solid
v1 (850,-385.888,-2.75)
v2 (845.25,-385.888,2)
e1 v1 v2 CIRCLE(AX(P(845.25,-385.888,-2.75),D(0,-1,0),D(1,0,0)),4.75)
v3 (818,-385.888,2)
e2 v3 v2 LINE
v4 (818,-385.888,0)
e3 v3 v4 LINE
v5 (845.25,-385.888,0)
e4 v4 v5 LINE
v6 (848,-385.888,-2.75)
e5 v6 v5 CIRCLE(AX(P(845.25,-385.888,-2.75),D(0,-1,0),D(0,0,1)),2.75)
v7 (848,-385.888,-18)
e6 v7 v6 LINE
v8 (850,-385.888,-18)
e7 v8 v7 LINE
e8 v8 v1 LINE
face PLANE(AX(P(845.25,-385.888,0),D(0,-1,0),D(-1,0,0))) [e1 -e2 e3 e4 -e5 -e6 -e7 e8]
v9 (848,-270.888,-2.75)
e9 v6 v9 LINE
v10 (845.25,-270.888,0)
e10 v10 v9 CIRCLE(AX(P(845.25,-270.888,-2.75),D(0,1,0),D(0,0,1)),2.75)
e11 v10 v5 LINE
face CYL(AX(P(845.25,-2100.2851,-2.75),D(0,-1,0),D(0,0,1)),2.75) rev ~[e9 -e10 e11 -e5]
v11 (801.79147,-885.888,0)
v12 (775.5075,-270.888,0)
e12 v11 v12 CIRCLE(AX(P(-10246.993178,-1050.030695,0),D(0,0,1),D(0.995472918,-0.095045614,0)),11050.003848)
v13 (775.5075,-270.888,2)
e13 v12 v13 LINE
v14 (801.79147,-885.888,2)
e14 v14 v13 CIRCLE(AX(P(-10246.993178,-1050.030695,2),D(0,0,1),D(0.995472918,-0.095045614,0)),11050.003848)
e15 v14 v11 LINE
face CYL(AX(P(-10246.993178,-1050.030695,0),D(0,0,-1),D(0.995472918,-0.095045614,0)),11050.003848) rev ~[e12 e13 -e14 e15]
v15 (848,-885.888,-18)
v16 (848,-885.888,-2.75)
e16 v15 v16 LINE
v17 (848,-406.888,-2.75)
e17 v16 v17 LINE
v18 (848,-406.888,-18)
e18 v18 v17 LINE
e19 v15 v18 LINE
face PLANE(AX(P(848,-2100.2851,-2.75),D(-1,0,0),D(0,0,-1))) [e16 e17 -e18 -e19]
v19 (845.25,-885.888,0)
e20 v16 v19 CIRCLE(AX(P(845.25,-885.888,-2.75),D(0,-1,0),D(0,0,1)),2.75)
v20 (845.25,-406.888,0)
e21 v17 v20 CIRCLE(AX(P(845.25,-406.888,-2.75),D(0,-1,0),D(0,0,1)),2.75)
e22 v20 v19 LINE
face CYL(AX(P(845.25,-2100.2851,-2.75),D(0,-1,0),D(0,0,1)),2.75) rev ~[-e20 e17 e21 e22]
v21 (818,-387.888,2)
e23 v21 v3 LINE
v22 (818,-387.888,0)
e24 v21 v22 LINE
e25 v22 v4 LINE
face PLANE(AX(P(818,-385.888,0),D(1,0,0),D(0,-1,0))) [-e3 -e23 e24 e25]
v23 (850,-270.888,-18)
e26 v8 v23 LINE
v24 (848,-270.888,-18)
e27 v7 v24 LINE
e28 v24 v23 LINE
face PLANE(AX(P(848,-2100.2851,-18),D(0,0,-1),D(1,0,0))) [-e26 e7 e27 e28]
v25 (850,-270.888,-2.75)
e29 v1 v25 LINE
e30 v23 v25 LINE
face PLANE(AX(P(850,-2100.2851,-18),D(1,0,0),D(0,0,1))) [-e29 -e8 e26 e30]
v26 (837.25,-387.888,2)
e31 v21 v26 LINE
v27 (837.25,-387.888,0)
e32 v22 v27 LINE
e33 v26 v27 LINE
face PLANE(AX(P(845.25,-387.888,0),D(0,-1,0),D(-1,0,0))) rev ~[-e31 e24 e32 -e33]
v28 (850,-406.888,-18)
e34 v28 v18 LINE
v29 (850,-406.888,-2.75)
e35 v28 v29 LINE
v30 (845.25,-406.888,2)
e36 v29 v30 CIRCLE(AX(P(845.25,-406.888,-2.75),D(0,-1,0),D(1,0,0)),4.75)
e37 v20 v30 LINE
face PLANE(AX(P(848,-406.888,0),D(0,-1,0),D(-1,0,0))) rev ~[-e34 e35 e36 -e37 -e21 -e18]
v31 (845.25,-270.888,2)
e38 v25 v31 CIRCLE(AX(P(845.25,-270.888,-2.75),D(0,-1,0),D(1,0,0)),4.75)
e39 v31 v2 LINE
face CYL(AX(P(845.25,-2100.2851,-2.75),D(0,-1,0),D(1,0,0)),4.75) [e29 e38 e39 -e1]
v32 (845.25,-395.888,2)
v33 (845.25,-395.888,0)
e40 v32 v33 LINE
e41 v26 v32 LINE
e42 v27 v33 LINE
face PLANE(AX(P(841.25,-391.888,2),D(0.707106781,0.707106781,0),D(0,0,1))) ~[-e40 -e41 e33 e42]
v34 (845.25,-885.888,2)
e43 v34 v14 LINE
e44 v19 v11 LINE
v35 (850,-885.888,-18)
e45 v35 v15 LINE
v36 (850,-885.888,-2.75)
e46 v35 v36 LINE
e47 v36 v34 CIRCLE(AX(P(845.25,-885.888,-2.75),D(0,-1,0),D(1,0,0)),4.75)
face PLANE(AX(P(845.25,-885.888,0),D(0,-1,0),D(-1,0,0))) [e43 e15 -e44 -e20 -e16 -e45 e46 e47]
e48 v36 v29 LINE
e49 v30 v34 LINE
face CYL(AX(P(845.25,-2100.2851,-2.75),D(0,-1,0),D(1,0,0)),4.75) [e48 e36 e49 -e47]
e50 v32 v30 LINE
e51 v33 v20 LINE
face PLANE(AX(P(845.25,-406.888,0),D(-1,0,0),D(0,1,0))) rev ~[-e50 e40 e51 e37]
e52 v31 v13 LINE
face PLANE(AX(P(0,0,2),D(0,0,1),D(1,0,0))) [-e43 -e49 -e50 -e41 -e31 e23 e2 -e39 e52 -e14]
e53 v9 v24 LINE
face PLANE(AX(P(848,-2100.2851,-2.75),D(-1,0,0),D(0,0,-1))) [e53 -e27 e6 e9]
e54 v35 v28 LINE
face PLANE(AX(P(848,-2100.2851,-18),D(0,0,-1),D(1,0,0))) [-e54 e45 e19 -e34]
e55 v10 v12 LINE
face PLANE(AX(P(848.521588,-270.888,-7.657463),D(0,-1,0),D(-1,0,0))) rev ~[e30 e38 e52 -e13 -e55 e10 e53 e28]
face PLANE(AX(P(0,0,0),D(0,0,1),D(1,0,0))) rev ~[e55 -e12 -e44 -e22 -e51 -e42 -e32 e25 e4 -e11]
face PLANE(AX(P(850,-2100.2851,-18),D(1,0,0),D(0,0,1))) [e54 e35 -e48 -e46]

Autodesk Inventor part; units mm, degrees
ref_plane "YZ Plane" through (0, 0, 0) normal (1, 0, 0) x (0, 1, 0)
ref_plane "XZ Plane" through (0, 0, 0) normal (0, 1, 0) x (-1, 0, 0)
ref_plane "XY Plane" through (0, 0, 0) normal (0, 0, 1) x (1, 0, 0)
sketch "Sketch1" plane through (0, 0, 0) normal (0, 0, 1) x (1, 0, 0)
  arc A0 (750, -2100) -> (771.0671, -250.888) centre (-10250, -1050) ccw construction
  arc A1 (752.9864, -2100.2851) -> (772.2226, -225.7318) centre (-10246.9893, -1050.0309) ccw
  line L0 (-750, -2700) -> (-750, 0) construction
  line L1 (-800, 50) -> (-800, -2750) construction
  line L2 (-850, -2800) -> (-850, 100) construction
  line L3 (850, 100) -> (850, -2800)
  line L4 (800, -2750) -> (800, 50) construction
  line L5 (750, 0) -> (750, -2700) construction
  line L6 (771.0671, -250.888) -> (768.075, -251.105) construction
  line L7 (769.231, -225.9556) -> (772.2226, -225.7318) construction
  arc A2 (747.4657, -5.0326) -> (744.8748, -2.3426) centre (744.4792, -5.3164) ccw construction
  arc A3 (747.4657, -5.0326) -> (747.0136, -0.2851) centre (-10252.9897, -1050.251) ccw construction
  arc A4 (768.075, -251.105) -> (747.4657, -5.0326) centre (-10252.9897, -1050.251) ccw construction
  line L8 (750, 0) -> (747.0136, -0.2851) construction
  arc A5 (750.4522, -4.7486) -> (750, 0) centre (-10250, -1050) ccw construction
  arc A6 (750.4522, -4.7486) -> (745.2706, 0.6314) centre (744.4791, -5.3162) ccw
  line L9 (-750, 0) -> (750, 0) construction
  line L10 (-850, 100) -> (850, 100) construction
  line L11 (800, 50) -> (-800, 50) construction
  arc A7 (771.0671, -250.888) -> (750.4522, -4.7486) centre (-10250, -1050) ccw
  line L12 (750, -2700) -> (-750, -2700) construction
  line L13 (750, -2100) -> (752.9864, -2100.2851) construction
  line L14 (-800, -2750) -> (800, -2750)
  line L15 (850, -2800) -> (-850, -2800) construction
  arc A8 (110, -2700) -> (114.1118, -2698.3696) centre (110, -2694) ccw construction
  line L16 (0, -2697) -> (110, -2697) construction
  line L17 (0, -2700) -> (0, -2697) construction
  arc A9 (750, 0) -> (745.2706, 0.6314) centre (0, -5600) ccw construction
  line L18 (750, 0) -> (749.6018, -2.9735) construction
  arc A10 (750, -3.0268) -> (0, 47) centre (-0.2, -5603) ccw construction
  line L19 (0, 47) -> (0, 0) construction
  line L20 (0, 50) -> (0, 47) construction
  line L21 (0, 100) -> (0, 50)
  arc A11 (745.2706, 0.6314) -> (0, 50) centre (0, -5600) ccw construction
  line L22 (-750, -2100) -> (750, -2100) construction
  arc A12 (110, -2697) -> (112.0559, -2696.1848) centre (110, -2694) ccw construction
  line L23 (676.3163, -2173.4556) -> (674.2605, -2171.2708) construction
  line L24 (690.4112, -2151.9536) -> (692.4671, -2154.1384) construction
  line L25 (752.0559, -2102.1848) -> (676.3163, -2173.4556) construction
  line L26 (114.1118, -2698.3696) -> (750, -2100) construction
  arc A13 (752.0559, -2102.1848) -> (752.9864, -2100.2851) centre (749.9998, -2099.9999) ccw construction
  line L27 (750, -2100) -> (752.0559, -2102.1848) construction
  arc A14 (749.1768, -2100.7746) -> (750.1074, -2098.8746) centre (747.1209, -2098.5898) ccw construction
  line L28 (112.0559, -2696.1848) -> (690.4112, -2151.9536) construction
  line L29 (850, -270.888) -> (775.5075, -270.888)
  arc A15 (800, 50) -> (0, 100) centre (0, -6325) ccw construction
  arc A16 (825.5075, -270.888) -> (800, 50) centre (-10637.5382, -1020.6324) ccw construction
  line L30 (825.5075, -270.888) -> (825.5075, 100) construction
  arc A17 (790.2374, -2130.793) -> (825.5075, -270.888) centre (-10200.9329, -992.0761) ccw construction
  line L31 (0, -2700) -> (0, -2750) construction
  line L32 (112.3791, -2700) -> (132.2053, -2750) construction
  line L33 (132.2053, -2750) -> (850, -2074.5565)
  arc A18 (771.0107, -250.8921) -> (767.3384, -201.0273) centre (769.231, -225.9556) ccw construction
  line L34 (850, -400) -> (783.8747, -400) construction
  line L35 (850, -900) -> (801.9921, -900) construction
  line L36 (850, -1400) -> (797.4673, -1400) construction
  line L37 (850, -1900) -> (770.2723, -1900) construction
  line L38 (350, 100) -> (350, 39.1489)
  line L39 (-1472.612, -150) -> (-973.4947, -150)
  line L40 (-1472.612, -700) -> (-973.4947, -700)
  line L41 (-1472.612, -1250) -> (-973.4947, -1250)
  line L42 (-1472.612, -1800) -> (-973.4947, -1800)
  line L43 (800, -2750) -> (850, -2750) construction
  line L44 (752.9864, -2100.2851) -> (850, -2100.2851)
  point P0 (822.6583, -2100.2851)
  dimension "d16" = 1500
  dimension "d17" = 2700
  dimension "d18" = 2100
  dimension "d19" = 6
  dimension "d20" = 3
  dimension "d21" = 3
  dimension "d22" = 6
  dimension "d23" = 3
  dimension "d24" = 251.771
  dimension "d25" = 50
  dimension "d26" = 50
  dimension "d27" = 3
  dimension "d28" = 110
  dimension "d29" = 25
  dimension "d30" = 104
  dimension "d31" = 25
  dimension "d32" = 20
  dimension "d33" = 50
  dimension "d57" = 500
  dimension "d58" = 500
  dimension "d59" = 500
  dimension "d60" = 500
  dimension "d61" = 500
  dimension "d83" = 250
  dimension "d86" = 550
  dimension "d91" = 274.5565
extrude "Plate3" add sketch "Sketch1" along normal blind 2
sketch "Sketch3" plane through (848, -270.888, 2) normal (1, 0, 0) x (0, 1, 0)
  line L0 (-1829.397, 0) -> (0, 0)
  line L1 (0, 0) -> (0, 20)
  line L2 (0, 20) -> (-1829.397, 20)
  line L3 (-1829.397, 20) -> (-1829.397, 0)
edge flange "Flange2" height 20 angle 90 thickness 2 bend radius 2.75 thickness toward (1, 0, 0) relief round relief width 2 relief depth 1 edges at (850, -1172.7223, 2) wall of the first edge with corners at (848, -2100.2851, 2) (848, -270.888, 2) (848, -270.888, -18) (848, -2100.2851, -18)
bend "Bend2"
corner "Corner2"
sketch "Sketch5" plane through (0, 0, 0) normal (0, 0, 1) x (1, 0, 0)
  line L0 (845.25, -2100.2851) -> (845.25, -270.888) projected
  line L1 (775.5075, -270.888) -> (845.25, -270.888) projected
  arc A0 (752.9864, -2100.2851) -> (775.5075, -270.888) centre (-10246.9893, -1050.0309) ccw projected
  line L2 (850, -270.888) -> (850, -2100.2851) projected
  line L3 (850, -385.888) -> (818, -385.888)
  line L4 (850, -387.888) -> (848, -387.888) construction
  line L5 (848, -2100.2851) -> (848, -270.888) projected
  line L6 (818, -385.888) -> (818, -387.888)
  line L7 (850, -885.887) -> (801.7915, -885.887) construction
  line L8 (850, -887.887) -> (801.821, -887.887) construction
  line L9 (819, -885.887) -> (819, -887.887) construction
  line L10 (850, -1385.887) -> (797.9055, -1385.887) construction
  line L11 (850, -1387.887) -> (797.8445, -1387.887) construction
  line L12 (819, -1385.887) -> (819, -1387.887) construction
  line L13 (850, -1885.887) -> (771.352, -1885.887) construction
  line L14 (850, -1887.887) -> (771.2001, -1887.887) construction
  line L15 (819, -1885.887) -> (819, -1887.887) construction
  line L16 (850, -906.887) -> (845.25, -906.887) construction
  line L17 (845.25, -1406.887) -> (850, -1406.887) construction
  line L18 (845.25, -1906.887) -> (850, -1906.887) construction
  line L19 (845.25, -2100.2851) -> (752.9864, -2100.2851) projected
  line L20 (850, -385.888) -> (850, -406.888)
  line L21 (848, -385.888) -> (848, -387.888) construction
  line L22 (850, -406.888) -> (848, -406.888)
  line L23 (818, -385.888) -> (783.034, -385.888) construction
  line L24 (818, -387.888) -> (783.1542, -387.888) construction
  line L25 (848, -387.888) -> (848, -406.888)
  line L26 (848, -387.888) -> (818, -387.888)
  line L27 (848, -406.888) -> (845.25, -406.888)
  point P0 (0, 0)
  point P1 (845.25, -380.4205)
  point P2 (848, -380.4205)
  point P3 (848, -1906.887)
  point P4 (848, -1887.887)
  point P5 (848, -1406.887)
  point P6 (848, -1387.887)
  point P7 (848, -906.887)
  point P8 (848, -887.887)
  point P9 (818, -386.888)
  point P10 (848, -406.888)
  point P11 (850, -410.4205)
  point P12 (848, -385.888)
  point P13 (819, -886.887)
  point P14 (819, -1386.887)
  point P15 (819, -1886.887)
  point P16 (848, -406.888)
  point P17 (845.25, -387.888)
  dimension "d69" = 1829.397
  dimension "d70" = 2
  dimension "d76" = 66.966
  dimension "d80" = 48.2085
  dimension "d81" = 31
  dimension "d94" = 21
  dimension "d95" = 31
  dimension "d96" = 21
  dimension "d97" = 31
  dimension "d98" = 21
  dimension "d102" = 78.648
  dimension "d104" = 52.0945
  dimension "d106" = 2
  dimension "d107" = 21
  dimension "d108" = 116
  dimension "d109" = 500
  dimension "d110" = 500
  dimension "d111" = 500
  dimension "d112" = 32
extrude "Extrusion2" cut sketch "Sketch5" along normal through all both and the other way through all contours L0 L26 L5 L27 | L26 L6 L3 L0 | L0 L3 L5 L26 | L5 L3 L2 L22
chamfer "Chamfer2" distance 8 angle 45 1 edges at (845.25, -387.888, 1)
pattern_linear "Rectangular Pattern3" count 4 spacing 500 along (0, -1, 0) of "Extrusion2", "Chamfer2"
sketch "Sketch6" plane through (0, 0, 0) normal (0, 0, -1) x (-1, 0, 0)
  line L0 (-803.1643, -805.888) -> (-817.1643, -805.888) construction
  line L1 (-817.1643, -805.888) -> (-817.1643, -605.888) construction
  line L2 (-817.1643, -605.888) -> (-803.1643, -605.888) construction
  line L3 (-803.1643, -605.888) -> (-803.1643, -805.888) construction
  line L4 (-752.9864, -2100.2851) -> (-845.25, -2100.2851) projected
  line L5 (-803.1643, -1810.888) -> (-803.1643, -1860.888) construction
  line L6 (-803.1643, -1860.888) -> (-815.1643, -1860.888) construction
  line L7 (-815.1643, -1860.888) -> (-815.1643, -1810.888) construction
  line L8 (-815.1643, -1810.888) -> (-803.1643, -1810.888) construction
  line L9 (-845.25, -1885.888) -> (-818, -1885.888) projected
  line L10 (-803.1643, -1310.888) -> (-803.1643, -1360.888) construction
  line L11 (-803.1643, -1360.888) -> (-815.1643, -1360.888) construction
  line L12 (-815.1643, -1360.888) -> (-815.1643, -1310.888) construction
  line L13 (-815.1643, -1310.888) -> (-803.1643, -1310.888) construction
  line L14 (-803.1643, -810.888) -> (-803.1643, -860.888) construction
  line L15 (-803.1643, -860.888) -> (-815.1643, -860.888) construction
  line L16 (-815.1643, -860.888) -> (-815.1643, -810.888) construction
  line L17 (-815.1643, -810.888) -> (-803.1643, -810.888) construction
  line L18 (-803.1643, -310.888) -> (-803.1643, -360.888) construction
  line L19 (-803.1643, -360.888) -> (-815.1643, -360.888) construction
  line L20 (-815.1643, -360.888) -> (-815.1643, -310.888) construction
  line L21 (-815.1643, -310.888) -> (-803.1643, -310.888) construction
  line L22 (-845.25, -1385.888) -> (-818, -1385.888) projected
  line L23 (-845.25, -885.888) -> (-818, -885.888) projected
  line L24 (-845.25, -385.888) -> (-818, -385.888) projected
  point P0 (0, 0)
  point P1 (-753.1643, -2098.4205)
  point P2 (-824.6397, -2098.4205)
  dimension "d120" = 200
  dimension "d121" = 14
  dimension "d124" = 50
  dimension "d125" = 12
  dimension "d126" = 50
  dimension "d127" = 25
  dimension "d128" = 50
  dimension "d129" = 12
  dimension "d130" = 50
  dimension "d131" = 12
  dimension "d132" = 50
  dimension "d133" = 12
  dimension "d134" = 50
  dimension "d135" = 25
  dimension "d136" = 25
  dimension "d137" = 25
  dimension "d138" = 50
  dimension "d139" = 50
  dimension "d140" = 50
  dimension "d143" = 80
mark "Mark1"
sketch "Sketch7" plane through (0, 0, 0) normal (0, 0, 1) x (1, 0, 0)
  line L0 (837.25, -1887.888) -> (845.25, -1895.888) construction
  line L1 (837.25, -1887.888) -> (818, -1887.888) construction
  line L2 (818, -1887.888) -> (818, -1885.888) construction
  line L3 (818, -1885.888) -> (845.25, -1885.888) construction
  line L4 (845.25, -1885.888) -> (845.25, -1406.888) construction
  line L5 (845.25, -1406.888) -> (845.25, -1395.888) construction
  line L6 (837.25, -1387.888) -> (845.25, -1395.888) construction
  line L7 (837.25, -1387.888) -> (818, -1387.888) construction
  line L8 (818, -1387.888) -> (818, -1385.888) construction
  line L9 (818, -1385.888) -> (845.25, -1385.888) construction
  line L10 (845.25, -1385.888) -> (845.25, -906.888) construction
  line L11 (845.25, -906.888) -> (845.25, -895.888) construction
  line L12 (837.25, -887.888) -> (845.25, -895.888) construction
  line L13 (837.25, -887.888) -> (818, -887.888) construction
  line L14 (818, -887.888) -> (818, -885.888) construction
  line L15 (818, -885.888) -> (845.25, -885.888) construction
  line L16 (845.25, -885.888) -> (845.25, -406.888) construction
  line L17 (845.25, -406.888) -> (845.25, -395.888) projected
  line L18 (837.25, -387.888) -> (845.25, -395.888) projected
  line L19 (837.25, -387.888) -> (818, -387.888) projected
  line L20 (818, -387.888) -> (818, -385.888) projected
  line L21 (818, -385.888) -> (845.25, -385.888) projected
  line L22 (845.25, -385.888) -> (845.25, -270.888) projected
  line L23 (775.5075, -270.888) -> (845.25, -270.888) projected
  arc A0 (752.9864, -2100.2851) -> (775.5075, -270.888) centre (-10246.9893, -1050.0309) ccw construction
  line L24 (845.25, -2100.2851) -> (752.9864, -2100.2851) construction
  line L25 (845.25, -2100.2851) -> (845.25, -1906.888) construction
  line L26 (845.25, -1906.888) -> (845.25, -1895.888) construction
  line L27 (716.6808, -2324.332) -> (990.5996, -2324.332)
  line L28 (990.5996, -2324.332) -> (990.5996, -885.888)
  line L29 (990.5996, -885.888) -> (716.6808, -885.888)
  line L30 (716.6808, -885.888) -> (716.6808, -2324.332)
  line L31 (848, -1385.888) -> (845.25, -1385.888) projected
  line L32 (845.25, -906.888) -> (845.25, -1385.888) projected
  line L33 (845.25, -906.888) -> (848, -906.888) projected
  line L34 (848, -1385.888) -> (848, -906.888) projected
  line L35 (848, -885.888) -> (845.25, -885.888) projected
  line L36 (845.25, -406.888) -> (845.25, -885.888) projected
  line L37 (845.25, -406.888) -> (848, -406.888) projected
  line L38 (848, -885.888) -> (848, -406.888) projected
  point P0 (0, 0)
extrude "Extrusion3" cut sketch "Sketch7" along normal through all both and the other way through all contours L30 L29 L28 L27 | L31 L32 L33 L34
equation "\"d16\" = d34"
equation "\"d17\" = d35"
equation "\"d18\" = d36"
equation "\"d19\" = d37"
equation "\"d20\" = d38"
equation "\"d21\" = d39"
equation "\"d22\" = d39 + d43"
equation "\"d23\" = d39"
equation "\"d27\" = d39"
equation "\"d28\" = 0.5 * d44"
equation "\"d29\" = d41"
equation "\"d30\" = d42"
equation "\"d31\" = d41"
equation "\"d33\" = d25"
equation "\"Стрингер_3\" = 66.766"
equation "\"d37\" = d39 + d43"
equation "\"d38\" = d39"
equation "\"d43\" = d39"
equation "\"Стрингер_4\" = 48.00853"
equation "\"Стрингер_5\" = 51.89453"
equation "\"Стрингер_6\" = 78.44803"
equation "\"d34\" = 1500"
equation "\"d35\" = 2700"
equation "\"d36\" = 2100"
equation "\"d39\" = 3"
equation "\"d44\" = 220"
equation "\"d41\" = 25"
equation "\"d42\" = 104"
properties part number "MSC 054 rib hip 1" material "Stainless Steel"
